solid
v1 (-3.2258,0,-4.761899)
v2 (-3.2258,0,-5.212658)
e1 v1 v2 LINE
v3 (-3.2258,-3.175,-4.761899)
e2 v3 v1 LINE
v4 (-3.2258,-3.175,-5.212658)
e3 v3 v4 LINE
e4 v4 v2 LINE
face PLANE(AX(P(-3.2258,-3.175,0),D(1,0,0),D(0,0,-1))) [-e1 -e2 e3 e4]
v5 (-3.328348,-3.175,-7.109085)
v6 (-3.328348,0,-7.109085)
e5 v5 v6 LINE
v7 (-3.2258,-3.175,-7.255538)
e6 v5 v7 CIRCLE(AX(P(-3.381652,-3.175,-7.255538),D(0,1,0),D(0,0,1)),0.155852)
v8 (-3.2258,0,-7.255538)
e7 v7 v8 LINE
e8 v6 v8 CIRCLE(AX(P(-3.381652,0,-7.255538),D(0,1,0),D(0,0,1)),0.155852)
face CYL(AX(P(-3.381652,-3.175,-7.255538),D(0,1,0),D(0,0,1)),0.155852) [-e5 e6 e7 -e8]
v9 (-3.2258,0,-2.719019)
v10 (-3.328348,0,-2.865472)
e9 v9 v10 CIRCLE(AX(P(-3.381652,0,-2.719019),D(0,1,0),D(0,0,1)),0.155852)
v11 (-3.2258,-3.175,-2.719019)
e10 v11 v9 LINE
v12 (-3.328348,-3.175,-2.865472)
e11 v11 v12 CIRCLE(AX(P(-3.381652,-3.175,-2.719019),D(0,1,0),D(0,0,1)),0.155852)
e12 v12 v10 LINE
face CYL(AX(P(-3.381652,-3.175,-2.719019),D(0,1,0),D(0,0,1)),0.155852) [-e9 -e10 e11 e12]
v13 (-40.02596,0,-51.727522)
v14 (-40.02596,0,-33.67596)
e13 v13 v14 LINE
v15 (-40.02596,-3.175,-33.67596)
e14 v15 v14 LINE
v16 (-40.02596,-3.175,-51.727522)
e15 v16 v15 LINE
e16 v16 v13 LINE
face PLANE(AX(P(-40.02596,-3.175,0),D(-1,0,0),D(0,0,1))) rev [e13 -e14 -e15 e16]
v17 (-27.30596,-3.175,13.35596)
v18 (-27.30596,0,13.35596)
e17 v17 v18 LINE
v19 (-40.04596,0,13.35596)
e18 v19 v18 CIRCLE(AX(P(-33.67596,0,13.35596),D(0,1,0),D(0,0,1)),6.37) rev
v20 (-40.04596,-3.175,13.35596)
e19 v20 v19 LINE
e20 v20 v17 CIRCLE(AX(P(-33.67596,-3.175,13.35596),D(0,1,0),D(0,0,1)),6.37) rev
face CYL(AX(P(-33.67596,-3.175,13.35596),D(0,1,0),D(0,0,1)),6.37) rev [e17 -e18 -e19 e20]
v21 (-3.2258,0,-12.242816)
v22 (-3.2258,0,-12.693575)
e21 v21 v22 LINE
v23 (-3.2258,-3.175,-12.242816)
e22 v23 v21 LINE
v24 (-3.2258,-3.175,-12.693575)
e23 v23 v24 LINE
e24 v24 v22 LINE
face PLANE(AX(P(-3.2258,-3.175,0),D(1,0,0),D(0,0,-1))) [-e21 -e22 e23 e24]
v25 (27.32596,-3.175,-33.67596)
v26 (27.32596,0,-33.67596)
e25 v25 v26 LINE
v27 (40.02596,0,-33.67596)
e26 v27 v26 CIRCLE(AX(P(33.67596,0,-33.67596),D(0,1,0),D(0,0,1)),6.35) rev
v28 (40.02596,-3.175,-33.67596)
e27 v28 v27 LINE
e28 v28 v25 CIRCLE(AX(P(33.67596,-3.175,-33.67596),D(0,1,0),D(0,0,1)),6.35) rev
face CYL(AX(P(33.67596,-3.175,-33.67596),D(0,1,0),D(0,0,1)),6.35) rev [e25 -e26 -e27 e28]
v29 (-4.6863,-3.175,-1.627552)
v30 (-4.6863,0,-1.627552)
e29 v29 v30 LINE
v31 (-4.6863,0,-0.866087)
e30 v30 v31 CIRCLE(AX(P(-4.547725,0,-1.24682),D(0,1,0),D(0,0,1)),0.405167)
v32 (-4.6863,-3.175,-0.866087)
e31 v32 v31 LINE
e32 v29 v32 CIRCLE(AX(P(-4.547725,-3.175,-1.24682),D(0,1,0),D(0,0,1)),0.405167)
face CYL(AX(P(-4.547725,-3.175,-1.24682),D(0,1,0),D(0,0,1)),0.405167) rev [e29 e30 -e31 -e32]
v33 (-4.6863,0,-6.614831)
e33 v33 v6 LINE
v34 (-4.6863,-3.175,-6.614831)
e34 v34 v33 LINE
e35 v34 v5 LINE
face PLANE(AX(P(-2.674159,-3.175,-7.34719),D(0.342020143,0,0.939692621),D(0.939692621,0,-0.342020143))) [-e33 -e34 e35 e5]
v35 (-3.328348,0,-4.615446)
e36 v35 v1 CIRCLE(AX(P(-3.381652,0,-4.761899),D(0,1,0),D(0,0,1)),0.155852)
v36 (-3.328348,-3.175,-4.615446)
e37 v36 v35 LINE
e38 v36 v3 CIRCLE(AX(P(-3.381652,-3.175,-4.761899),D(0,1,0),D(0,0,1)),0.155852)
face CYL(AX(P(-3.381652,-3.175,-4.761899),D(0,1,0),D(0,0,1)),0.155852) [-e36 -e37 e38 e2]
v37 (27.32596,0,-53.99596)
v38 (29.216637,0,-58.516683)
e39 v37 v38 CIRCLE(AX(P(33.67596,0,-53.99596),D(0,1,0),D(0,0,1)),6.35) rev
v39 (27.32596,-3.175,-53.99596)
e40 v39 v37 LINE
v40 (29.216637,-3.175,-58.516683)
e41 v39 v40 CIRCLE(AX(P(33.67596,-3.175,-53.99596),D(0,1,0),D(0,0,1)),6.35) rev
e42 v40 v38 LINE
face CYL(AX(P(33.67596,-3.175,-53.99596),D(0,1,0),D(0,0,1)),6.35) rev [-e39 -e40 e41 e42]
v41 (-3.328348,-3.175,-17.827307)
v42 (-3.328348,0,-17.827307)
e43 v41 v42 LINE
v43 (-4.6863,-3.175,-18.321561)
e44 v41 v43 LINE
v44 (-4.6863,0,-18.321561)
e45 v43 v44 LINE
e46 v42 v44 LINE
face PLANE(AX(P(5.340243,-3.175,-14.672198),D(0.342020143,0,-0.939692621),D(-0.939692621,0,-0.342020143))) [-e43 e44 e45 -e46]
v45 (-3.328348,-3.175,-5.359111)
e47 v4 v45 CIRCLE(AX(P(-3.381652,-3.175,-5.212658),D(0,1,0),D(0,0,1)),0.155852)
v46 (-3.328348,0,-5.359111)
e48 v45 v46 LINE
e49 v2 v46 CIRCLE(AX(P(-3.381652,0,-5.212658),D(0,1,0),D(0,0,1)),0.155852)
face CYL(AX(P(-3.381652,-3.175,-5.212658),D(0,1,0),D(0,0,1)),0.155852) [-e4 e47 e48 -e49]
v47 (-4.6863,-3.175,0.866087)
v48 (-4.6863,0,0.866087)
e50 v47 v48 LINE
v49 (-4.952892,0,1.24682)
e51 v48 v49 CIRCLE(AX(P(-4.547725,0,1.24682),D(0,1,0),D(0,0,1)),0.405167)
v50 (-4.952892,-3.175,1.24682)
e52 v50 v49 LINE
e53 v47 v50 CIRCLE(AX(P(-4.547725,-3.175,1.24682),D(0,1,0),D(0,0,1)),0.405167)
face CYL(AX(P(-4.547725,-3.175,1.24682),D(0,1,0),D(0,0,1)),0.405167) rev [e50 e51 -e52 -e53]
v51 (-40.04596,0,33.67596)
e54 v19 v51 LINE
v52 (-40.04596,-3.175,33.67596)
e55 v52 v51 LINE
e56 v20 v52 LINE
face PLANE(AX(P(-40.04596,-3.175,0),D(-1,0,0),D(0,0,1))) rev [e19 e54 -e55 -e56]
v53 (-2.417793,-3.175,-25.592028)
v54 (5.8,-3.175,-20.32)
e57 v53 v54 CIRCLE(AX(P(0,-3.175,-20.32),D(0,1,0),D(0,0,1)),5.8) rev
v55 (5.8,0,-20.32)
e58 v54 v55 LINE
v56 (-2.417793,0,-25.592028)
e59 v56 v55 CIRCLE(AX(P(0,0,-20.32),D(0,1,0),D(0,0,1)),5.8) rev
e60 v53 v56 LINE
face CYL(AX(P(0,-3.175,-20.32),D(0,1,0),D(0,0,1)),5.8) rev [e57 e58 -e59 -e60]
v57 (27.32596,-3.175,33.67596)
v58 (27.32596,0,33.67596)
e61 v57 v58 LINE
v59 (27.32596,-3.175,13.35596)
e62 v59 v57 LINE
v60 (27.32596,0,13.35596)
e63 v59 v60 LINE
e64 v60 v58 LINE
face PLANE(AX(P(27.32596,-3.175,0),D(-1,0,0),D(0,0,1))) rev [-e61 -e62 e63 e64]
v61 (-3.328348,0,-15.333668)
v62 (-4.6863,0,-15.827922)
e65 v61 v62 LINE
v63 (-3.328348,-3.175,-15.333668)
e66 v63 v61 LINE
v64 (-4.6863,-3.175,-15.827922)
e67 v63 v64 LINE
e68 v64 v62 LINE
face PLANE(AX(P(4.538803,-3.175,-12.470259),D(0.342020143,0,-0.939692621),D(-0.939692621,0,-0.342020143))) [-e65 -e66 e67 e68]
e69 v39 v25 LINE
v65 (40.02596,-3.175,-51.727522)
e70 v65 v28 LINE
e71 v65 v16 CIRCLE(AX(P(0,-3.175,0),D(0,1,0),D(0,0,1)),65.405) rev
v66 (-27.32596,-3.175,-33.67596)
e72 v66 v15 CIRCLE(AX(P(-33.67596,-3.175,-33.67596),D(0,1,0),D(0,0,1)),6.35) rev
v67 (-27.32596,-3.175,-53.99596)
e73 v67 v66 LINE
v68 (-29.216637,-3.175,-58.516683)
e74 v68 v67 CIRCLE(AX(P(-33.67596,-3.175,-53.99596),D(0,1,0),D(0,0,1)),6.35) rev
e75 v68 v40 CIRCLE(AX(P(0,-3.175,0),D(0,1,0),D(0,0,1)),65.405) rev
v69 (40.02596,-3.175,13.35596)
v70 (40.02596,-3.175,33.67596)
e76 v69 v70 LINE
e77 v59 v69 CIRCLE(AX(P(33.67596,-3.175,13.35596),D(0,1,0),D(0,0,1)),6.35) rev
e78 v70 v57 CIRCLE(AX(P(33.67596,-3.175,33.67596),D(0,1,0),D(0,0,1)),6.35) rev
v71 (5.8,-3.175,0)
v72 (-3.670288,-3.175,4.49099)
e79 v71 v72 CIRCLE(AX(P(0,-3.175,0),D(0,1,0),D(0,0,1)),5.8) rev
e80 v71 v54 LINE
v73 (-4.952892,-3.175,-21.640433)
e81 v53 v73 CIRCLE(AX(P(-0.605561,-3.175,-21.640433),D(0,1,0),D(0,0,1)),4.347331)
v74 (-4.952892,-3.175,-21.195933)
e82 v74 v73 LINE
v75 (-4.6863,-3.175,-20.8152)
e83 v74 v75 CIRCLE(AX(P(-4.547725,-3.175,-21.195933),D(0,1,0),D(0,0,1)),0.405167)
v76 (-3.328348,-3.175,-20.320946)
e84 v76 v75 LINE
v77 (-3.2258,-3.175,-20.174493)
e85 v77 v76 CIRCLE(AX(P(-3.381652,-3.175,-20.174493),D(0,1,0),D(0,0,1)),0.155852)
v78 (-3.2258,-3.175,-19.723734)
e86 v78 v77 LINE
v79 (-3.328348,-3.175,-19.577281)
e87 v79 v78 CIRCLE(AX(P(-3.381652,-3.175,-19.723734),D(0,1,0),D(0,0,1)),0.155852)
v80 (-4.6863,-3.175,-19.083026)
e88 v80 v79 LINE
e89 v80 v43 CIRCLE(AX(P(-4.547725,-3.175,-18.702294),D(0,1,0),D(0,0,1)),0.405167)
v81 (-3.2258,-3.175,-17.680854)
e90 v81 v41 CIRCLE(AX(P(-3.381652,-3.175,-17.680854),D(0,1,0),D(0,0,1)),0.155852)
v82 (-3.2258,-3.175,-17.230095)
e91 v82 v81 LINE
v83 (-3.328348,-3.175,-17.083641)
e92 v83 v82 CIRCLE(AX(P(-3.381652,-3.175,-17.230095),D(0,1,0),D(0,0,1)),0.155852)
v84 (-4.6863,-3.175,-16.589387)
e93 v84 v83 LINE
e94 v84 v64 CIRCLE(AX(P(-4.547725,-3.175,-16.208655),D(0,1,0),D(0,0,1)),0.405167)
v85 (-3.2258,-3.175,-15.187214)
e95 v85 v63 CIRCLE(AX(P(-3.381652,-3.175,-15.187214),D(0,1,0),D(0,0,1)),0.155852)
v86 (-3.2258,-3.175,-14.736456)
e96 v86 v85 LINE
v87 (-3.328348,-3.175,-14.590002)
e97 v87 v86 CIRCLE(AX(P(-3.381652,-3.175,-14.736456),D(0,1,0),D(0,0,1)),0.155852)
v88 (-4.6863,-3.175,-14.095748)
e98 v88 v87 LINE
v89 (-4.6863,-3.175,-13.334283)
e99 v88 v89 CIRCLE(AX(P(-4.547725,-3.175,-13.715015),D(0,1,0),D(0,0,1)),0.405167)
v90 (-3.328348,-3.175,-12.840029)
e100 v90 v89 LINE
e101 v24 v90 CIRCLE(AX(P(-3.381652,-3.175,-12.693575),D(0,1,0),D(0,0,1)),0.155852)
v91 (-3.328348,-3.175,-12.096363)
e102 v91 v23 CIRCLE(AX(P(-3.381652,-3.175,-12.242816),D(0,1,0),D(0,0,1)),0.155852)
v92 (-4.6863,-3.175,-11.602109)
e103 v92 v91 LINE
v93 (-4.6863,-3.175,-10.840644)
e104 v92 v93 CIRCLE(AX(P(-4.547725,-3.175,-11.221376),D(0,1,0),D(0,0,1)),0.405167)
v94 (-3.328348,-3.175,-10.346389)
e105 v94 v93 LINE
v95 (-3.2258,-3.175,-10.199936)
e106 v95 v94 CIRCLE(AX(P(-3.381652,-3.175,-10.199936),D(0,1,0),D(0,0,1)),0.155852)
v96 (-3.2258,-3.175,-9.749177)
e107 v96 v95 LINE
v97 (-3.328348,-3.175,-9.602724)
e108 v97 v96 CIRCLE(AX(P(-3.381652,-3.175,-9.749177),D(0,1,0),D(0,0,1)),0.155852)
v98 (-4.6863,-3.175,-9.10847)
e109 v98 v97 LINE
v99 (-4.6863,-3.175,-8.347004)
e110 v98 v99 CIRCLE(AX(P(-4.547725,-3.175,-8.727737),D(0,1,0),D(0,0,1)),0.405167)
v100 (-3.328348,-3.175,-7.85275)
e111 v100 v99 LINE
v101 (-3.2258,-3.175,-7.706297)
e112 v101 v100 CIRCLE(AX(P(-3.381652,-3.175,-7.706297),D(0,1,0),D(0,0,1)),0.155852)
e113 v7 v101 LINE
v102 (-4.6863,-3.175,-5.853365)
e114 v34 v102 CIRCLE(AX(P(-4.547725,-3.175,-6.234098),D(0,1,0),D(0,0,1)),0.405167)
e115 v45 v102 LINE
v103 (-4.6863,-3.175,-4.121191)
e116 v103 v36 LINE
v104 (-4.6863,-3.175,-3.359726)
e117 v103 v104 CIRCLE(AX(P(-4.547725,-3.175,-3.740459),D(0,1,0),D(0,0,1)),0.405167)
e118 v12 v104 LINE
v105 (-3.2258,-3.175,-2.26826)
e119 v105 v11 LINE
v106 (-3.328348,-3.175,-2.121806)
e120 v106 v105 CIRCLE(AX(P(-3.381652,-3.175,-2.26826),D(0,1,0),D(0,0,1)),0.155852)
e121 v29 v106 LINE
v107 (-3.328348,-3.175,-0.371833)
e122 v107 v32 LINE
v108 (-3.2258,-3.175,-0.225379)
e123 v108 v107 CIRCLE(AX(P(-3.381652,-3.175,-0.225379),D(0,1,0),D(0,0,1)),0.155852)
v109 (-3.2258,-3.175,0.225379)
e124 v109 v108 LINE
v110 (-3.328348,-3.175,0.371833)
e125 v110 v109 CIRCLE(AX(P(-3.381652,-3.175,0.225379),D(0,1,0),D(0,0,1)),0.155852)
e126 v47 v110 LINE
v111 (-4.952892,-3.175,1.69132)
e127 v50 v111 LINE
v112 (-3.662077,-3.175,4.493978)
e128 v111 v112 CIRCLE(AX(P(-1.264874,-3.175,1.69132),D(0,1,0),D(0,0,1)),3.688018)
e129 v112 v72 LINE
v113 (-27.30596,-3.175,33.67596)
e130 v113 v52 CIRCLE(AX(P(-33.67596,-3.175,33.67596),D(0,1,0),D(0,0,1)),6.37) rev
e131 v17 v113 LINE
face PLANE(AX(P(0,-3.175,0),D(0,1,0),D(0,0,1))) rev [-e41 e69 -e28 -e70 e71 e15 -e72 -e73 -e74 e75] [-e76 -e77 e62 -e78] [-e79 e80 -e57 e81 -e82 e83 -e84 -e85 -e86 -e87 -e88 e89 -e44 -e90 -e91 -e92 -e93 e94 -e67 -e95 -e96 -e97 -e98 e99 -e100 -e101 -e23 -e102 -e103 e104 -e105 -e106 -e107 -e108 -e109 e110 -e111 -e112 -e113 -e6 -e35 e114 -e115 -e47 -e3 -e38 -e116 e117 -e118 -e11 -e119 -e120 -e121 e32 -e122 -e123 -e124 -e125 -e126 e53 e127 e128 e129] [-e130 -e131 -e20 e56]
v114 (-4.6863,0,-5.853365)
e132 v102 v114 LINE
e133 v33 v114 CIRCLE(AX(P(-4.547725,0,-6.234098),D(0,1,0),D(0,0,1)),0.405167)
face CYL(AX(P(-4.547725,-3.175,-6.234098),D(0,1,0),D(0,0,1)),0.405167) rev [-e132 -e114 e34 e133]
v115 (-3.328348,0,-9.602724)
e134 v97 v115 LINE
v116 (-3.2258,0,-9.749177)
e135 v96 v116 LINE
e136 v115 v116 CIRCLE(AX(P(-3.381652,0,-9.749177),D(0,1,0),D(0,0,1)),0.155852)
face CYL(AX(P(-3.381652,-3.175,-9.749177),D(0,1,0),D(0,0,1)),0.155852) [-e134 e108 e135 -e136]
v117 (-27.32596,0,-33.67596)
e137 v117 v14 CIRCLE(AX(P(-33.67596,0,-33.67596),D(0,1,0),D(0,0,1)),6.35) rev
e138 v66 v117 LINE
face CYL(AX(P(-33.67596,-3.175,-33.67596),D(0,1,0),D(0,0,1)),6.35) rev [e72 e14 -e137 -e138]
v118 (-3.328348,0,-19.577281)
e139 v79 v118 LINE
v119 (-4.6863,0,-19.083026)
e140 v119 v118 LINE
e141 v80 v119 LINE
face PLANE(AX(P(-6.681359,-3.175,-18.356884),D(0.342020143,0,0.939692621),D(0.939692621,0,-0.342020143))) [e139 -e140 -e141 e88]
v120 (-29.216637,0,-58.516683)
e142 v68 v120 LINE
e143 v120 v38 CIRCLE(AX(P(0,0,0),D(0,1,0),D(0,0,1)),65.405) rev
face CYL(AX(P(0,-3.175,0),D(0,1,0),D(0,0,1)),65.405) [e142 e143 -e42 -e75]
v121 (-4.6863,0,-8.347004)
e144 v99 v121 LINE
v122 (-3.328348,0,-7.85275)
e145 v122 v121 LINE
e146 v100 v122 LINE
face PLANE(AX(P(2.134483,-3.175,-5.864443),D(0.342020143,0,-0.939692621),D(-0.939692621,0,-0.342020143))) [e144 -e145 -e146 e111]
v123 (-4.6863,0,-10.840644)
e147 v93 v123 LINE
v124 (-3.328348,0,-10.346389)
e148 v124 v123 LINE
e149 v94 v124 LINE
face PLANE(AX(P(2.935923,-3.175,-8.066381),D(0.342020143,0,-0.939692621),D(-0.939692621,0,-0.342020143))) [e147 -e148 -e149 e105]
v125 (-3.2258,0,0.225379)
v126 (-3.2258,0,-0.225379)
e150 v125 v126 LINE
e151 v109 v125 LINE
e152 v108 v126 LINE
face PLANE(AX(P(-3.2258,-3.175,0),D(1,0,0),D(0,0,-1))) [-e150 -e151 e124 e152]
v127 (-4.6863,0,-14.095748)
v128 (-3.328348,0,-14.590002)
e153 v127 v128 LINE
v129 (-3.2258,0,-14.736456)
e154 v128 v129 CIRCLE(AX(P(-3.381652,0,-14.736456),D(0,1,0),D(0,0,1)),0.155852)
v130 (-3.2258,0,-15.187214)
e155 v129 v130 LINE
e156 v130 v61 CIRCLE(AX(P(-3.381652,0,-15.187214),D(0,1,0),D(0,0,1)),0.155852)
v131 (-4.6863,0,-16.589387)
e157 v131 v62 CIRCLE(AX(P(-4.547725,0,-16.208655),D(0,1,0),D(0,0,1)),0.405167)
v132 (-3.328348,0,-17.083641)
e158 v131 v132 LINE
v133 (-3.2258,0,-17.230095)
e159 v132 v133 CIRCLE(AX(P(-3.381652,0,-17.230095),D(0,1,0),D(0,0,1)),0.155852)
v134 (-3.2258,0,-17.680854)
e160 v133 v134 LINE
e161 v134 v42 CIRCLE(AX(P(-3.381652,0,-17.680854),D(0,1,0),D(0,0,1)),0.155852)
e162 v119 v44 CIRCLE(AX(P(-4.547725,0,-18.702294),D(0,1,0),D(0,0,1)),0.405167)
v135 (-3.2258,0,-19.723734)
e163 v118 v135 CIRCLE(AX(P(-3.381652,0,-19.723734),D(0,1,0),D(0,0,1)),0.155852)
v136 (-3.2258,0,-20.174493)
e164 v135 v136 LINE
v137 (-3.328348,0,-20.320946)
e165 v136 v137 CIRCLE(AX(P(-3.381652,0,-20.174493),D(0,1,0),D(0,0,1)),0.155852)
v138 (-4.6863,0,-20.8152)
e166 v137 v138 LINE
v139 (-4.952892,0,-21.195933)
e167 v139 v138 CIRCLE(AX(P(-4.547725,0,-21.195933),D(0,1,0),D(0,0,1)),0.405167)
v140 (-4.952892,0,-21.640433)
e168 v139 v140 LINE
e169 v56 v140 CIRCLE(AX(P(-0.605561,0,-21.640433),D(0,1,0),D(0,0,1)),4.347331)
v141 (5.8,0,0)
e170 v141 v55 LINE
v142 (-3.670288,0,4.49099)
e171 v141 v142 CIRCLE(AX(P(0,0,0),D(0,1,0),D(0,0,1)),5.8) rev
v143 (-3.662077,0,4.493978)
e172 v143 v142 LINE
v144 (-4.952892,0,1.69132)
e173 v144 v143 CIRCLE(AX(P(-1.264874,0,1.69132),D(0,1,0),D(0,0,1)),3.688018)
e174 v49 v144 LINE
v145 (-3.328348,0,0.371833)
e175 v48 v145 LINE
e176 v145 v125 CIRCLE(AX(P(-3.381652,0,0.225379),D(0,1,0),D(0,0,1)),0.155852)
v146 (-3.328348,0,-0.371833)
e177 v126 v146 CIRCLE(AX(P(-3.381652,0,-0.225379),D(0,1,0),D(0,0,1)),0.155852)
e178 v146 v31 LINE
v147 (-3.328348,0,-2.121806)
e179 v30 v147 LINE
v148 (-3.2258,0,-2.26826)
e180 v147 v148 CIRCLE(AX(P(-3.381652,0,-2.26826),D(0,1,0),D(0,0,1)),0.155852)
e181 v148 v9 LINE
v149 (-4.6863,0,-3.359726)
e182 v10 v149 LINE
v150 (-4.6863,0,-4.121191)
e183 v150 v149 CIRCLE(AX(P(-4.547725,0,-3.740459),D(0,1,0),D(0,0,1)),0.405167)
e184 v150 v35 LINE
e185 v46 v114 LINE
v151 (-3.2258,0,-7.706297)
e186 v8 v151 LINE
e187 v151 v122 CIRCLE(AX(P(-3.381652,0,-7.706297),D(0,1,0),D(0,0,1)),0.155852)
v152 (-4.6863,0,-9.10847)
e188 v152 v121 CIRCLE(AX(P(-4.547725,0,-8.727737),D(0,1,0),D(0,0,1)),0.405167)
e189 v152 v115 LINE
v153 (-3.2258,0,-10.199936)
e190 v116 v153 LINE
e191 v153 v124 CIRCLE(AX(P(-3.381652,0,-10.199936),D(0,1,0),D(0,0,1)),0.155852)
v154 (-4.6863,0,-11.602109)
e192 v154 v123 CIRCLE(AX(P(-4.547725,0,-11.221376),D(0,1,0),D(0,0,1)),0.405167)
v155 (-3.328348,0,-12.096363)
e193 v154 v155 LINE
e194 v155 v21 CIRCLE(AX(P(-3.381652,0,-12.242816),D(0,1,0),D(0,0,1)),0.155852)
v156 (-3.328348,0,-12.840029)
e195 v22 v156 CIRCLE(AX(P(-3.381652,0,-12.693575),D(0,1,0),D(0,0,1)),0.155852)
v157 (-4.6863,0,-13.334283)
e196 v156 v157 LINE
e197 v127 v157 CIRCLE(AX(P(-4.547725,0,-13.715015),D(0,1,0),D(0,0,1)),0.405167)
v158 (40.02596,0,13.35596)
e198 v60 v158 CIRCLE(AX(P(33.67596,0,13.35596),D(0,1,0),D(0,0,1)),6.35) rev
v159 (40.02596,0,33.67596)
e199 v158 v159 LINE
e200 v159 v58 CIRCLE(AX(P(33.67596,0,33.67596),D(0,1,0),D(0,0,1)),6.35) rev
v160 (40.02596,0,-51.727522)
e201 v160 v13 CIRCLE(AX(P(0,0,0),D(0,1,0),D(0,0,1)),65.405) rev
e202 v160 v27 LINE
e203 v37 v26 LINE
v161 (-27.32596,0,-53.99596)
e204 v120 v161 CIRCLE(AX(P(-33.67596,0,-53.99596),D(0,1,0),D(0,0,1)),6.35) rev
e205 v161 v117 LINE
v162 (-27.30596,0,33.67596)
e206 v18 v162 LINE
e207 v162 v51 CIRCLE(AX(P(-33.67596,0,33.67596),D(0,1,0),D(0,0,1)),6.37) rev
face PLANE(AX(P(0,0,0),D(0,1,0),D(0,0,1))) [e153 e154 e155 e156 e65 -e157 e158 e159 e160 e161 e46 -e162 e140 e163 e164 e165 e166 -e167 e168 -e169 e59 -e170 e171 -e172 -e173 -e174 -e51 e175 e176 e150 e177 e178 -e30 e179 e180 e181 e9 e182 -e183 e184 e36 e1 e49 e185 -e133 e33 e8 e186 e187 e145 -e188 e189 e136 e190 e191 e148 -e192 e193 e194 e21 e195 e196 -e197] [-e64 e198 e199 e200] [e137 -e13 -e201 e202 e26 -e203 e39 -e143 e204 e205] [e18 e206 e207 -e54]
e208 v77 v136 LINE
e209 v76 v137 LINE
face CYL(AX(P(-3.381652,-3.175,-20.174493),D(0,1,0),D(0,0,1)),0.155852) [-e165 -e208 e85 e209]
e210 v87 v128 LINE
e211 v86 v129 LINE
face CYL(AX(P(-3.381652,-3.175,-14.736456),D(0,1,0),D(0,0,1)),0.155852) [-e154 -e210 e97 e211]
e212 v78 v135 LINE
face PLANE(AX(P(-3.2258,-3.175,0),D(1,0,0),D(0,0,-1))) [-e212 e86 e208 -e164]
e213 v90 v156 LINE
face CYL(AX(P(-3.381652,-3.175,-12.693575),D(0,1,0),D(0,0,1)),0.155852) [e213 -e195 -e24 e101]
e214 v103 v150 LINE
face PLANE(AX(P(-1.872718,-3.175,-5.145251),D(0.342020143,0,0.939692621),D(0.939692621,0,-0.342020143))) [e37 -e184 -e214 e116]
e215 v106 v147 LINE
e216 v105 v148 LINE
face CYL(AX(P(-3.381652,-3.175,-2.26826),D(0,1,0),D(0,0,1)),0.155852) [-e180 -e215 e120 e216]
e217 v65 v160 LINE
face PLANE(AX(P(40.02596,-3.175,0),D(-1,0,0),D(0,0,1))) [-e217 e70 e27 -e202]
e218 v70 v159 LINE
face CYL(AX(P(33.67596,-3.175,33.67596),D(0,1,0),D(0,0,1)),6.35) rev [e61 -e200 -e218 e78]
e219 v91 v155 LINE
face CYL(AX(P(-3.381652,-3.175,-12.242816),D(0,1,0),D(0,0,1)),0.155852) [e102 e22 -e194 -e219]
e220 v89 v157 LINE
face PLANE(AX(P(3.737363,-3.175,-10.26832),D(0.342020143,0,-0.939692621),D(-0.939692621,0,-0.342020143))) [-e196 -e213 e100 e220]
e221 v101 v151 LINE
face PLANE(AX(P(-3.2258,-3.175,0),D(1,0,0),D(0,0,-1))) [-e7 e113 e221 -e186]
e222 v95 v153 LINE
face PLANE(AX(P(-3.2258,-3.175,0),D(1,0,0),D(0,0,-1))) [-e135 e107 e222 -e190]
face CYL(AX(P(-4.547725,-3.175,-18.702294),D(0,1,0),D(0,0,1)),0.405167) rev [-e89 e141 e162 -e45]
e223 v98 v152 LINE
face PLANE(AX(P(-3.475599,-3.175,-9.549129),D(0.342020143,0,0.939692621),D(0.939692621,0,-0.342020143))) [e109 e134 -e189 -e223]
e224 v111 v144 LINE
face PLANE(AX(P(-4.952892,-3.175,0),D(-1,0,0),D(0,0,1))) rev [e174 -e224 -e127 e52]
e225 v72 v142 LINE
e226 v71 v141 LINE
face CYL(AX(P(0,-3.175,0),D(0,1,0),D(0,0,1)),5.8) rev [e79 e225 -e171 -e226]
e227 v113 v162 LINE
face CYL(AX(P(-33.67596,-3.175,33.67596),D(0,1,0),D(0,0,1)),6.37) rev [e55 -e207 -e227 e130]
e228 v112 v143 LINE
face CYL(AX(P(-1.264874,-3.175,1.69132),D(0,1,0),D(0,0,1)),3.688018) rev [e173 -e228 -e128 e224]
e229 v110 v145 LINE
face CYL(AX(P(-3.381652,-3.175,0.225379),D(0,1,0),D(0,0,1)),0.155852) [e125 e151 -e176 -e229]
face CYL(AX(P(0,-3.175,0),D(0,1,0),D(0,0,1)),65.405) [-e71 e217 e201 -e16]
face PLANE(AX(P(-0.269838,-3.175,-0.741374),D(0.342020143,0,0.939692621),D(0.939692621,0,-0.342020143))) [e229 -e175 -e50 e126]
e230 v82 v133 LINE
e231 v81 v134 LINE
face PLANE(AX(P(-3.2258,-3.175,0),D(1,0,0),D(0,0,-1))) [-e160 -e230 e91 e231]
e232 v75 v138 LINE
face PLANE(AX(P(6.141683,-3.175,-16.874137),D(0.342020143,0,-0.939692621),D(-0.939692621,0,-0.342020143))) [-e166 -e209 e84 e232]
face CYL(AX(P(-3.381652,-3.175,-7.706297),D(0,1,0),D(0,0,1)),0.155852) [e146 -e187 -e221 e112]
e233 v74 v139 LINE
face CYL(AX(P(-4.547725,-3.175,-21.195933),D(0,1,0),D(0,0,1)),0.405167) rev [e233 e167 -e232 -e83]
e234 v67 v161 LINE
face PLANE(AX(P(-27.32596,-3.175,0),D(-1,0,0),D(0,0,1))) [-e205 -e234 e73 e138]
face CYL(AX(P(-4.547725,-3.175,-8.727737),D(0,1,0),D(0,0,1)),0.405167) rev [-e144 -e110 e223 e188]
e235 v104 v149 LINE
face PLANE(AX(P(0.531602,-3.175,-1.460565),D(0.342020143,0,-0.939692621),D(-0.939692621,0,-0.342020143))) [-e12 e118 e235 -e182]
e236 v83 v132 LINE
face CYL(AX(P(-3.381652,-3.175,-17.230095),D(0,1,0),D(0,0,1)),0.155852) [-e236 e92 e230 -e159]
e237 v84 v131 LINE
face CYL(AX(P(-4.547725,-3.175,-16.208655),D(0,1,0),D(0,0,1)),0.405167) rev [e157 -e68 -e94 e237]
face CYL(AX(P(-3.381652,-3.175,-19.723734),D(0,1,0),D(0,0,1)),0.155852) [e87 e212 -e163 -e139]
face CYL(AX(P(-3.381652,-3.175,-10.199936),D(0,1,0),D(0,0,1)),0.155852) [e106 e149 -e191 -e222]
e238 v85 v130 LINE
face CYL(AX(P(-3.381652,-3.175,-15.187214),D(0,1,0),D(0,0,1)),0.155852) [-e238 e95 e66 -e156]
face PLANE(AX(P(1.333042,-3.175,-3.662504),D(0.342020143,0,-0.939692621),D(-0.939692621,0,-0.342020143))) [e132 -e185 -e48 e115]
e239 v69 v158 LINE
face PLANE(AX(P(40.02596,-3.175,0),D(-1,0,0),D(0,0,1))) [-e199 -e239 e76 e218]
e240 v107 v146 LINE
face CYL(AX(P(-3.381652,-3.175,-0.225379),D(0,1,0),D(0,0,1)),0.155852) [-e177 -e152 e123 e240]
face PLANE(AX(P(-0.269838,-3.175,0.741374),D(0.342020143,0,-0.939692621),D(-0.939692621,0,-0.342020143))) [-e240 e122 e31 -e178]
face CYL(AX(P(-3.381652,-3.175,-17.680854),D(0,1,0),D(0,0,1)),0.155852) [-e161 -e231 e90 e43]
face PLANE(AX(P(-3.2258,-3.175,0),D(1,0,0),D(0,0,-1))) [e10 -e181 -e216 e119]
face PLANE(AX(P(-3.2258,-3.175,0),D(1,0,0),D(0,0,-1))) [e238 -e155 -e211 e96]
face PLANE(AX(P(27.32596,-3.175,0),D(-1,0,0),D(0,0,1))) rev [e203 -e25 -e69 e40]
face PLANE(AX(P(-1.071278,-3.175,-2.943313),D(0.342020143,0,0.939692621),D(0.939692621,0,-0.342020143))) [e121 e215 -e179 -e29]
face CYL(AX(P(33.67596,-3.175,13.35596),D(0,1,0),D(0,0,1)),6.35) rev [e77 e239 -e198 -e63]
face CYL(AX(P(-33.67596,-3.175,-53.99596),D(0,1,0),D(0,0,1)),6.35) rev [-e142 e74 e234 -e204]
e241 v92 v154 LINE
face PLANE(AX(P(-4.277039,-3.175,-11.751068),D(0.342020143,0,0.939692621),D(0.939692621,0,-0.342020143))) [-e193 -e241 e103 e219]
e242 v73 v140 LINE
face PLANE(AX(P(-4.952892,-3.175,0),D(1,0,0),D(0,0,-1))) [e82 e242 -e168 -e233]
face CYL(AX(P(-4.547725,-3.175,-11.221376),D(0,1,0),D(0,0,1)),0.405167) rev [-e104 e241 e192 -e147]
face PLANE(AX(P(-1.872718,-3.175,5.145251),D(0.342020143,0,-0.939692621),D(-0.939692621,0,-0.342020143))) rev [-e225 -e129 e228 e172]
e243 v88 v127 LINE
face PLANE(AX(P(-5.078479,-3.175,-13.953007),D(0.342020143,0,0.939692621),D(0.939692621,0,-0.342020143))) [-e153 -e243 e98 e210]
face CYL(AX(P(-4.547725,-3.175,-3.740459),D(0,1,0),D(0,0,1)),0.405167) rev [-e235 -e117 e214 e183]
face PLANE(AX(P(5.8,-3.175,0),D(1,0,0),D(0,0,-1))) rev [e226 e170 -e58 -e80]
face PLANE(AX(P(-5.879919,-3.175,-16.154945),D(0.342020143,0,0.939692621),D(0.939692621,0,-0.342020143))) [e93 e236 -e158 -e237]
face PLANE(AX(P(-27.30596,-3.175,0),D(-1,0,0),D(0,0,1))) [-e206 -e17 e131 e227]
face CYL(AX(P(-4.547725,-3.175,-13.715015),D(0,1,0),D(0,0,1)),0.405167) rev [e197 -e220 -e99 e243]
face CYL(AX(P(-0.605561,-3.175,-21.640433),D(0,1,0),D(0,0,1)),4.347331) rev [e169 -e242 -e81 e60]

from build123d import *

# Parameters (mm, degrees)
BOSS_EXTRUDE1_DEPTH = 3.175
BOSS_EXTRUDE3_START = -3.175
BOSS_EXTRUDE3_DEPTH = 3.175


# Read off the part's stored shape, not the designer's step: Boss-Extrude3
with BuildPart() as part:
    # Sketch3 → Boss-Extrude1 (new body)
    with BuildSketch(Plane.XZ):
        with BuildLine():
            ThreePointArc((65.405, 0), (-28.808992359, 58.718446712), (-40.025960454, -51.727521831))
            Line((-40.025960454, -51.727521831), (-40.025960454, -33.675960454))
            ThreePointArc((-40.025960454, -33.675960454), (-33.675960454, -27.325960454), (-27.325960454, -33.675960454))
            Line((-27.325960454, -33.675960454), (-27.325960454, -53.995960454))
            ThreePointArc((-27.325960454, -53.995960454), (-27.817666914, -56.446041432), (-29.21663661, -58.516682836))
            ThreePointArc((-29.21663661, -58.516682836), (0, -65.405), (29.21663661, -58.516682836))
            ThreePointArc((29.21663661, -58.516682836), (27.817666914, -56.446041432), (27.325960454, -53.995960454))
            Line((27.325960454, -53.995960454), (27.325960454, -33.675960454))
            ThreePointArc((27.325960454, -33.675960454), (33.675960454, -27.325960454), (40.025960454, -33.675960454))
            Line((40.025960454, -33.675960454), (40.025960454, -51.727521831))
            ThreePointArc((40.025960454, -51.727521831), (58.718446712, -28.808992359), (65.405, 0))
        make_face()
        with BuildLine():
            ThreePointArc((-5.8, 0), (0, 5.8), (5.8, 0))
            Line((5.8, 0), (5.8, -20.32))
            ThreePointArc((5.8, -20.32), (0, -26.12), (-5.8, -20.32))
            Line((-5.8, -20.32), (-5.8, 0))
        make_face(mode=Mode.SUBTRACT)
        with BuildLine():
            ThreePointArc((-27.305960454, 13.355960454), (-33.675960454, 6.985960454), (-40.045960454, 13.355960454))
            Line((-40.045960454, 13.355960454), (-40.045960454, 33.675960454))
            ThreePointArc((-40.045960454, 33.675960454), (-33.675960454, 40.045960454), (-27.305960454, 33.675960454))
            Line((-27.305960454, 33.675960454), (-27.305960454, 13.355960454))
        make_face(mode=Mode.SUBTRACT)
        with BuildLine():
            ThreePointArc((40.025960454, 13.355960454), (33.675960454, 7.005960454), (27.325960454, 13.355960454))
            Line((27.325960454, 13.355960454), (27.325960454, 33.675960454))
            ThreePointArc((27.325960454, 33.675960454), (33.675960454, 40.025960454), (40.025960454, 33.675960454))
            Line((40.025960454, 33.675960454), (40.025960454, 13.355960454))
        make_face(mode=Mode.SUBTRACT)
    extrude(amount=BOSS_EXTRUDE1_DEPTH)

    # Boss-Extrude3 outline → Boss-Extrude3 (add)
    with BuildSketch(Plane(origin=(0, 0, 0), x_dir=(1, 0, 0), z_dir=(0, 1, 0)).offset(BOSS_EXTRUDE3_START)):
        with BuildLine():
            Line((-4.952891864, -1.691319584), (-4.952891864, -1.246819584))
            ThreePointArc((-4.952891864, -1.246819584), (-4.879618202, -1.014425219), (-4.6863, -0.866086946))
            Line((-4.6863, -0.866086946), (-3.328347771, -0.371832755))
            ThreePointArc((-3.328347771, -0.371832755), (-3.253985597, -0.314772651), (-3.2258, -0.22537936))
            Line((-3.2258, -0.22537936), (-3.2258, 0.22537936))
            ThreePointArc((-3.2258, 0.22537936), (-3.253985597, 0.314772651), (-3.328347771, 0.371832755))
            Line((-3.328347771, 0.371832755), (-4.6863, 0.866086946))
            ThreePointArc((-4.6863, 0.866086946), (-4.952891864, 1.246819585), (-4.6863, 1.627552223))
            Line((-4.6863, 1.627552223), (-3.328347771, 2.121806414))
            ThreePointArc((-3.328347771, 2.121806414), (-3.253985597, 2.178866518), (-3.2258, 2.268259809))
            Line((-3.2258, 2.268259809), (-3.2258, 2.719018529))
            ThreePointArc((-3.2258, 2.719018529), (-3.253985597, 2.80841182), (-3.328347771, 2.865471924))
            Line((-3.328347771, 2.865471924), (-4.6863, 3.359726115))
            ThreePointArc((-4.6863, 3.359726115), (-4.952891864, 3.740458754), (-4.6863, 4.121191392))
            Line((-4.6863, 4.121191392), (-3.328347771, 4.615445582))
            ThreePointArc((-3.328347771, 4.615445582), (-3.253985597, 4.672505686), (-3.2258, 4.761898978))
            Line((-3.2258, 4.761898978), (-3.2258, 5.212657697))
            ThreePointArc((-3.2258, 5.212657697), (-3.253985597, 5.302050989), (-3.328347771, 5.359111093))
            Line((-3.328347771, 5.359111093), (-4.6863, 5.853365283))
            ThreePointArc((-4.6863, 5.853365283), (-4.952891864, 6.234097921), (-4.6863, 6.61483056))
            Line((-4.6863, 6.61483056), (-3.328347771, 7.109084751))
            ThreePointArc((-3.328347771, 7.109084751), (-3.253985597, 7.166144855), (-3.2258, 7.255538147))
            Line((-3.2258, 7.255538147), (-3.2258, 7.706296866))
            ThreePointArc((-3.2258, 7.706296866), (-3.253985597, 7.795690157), (-3.328347771, 7.852750261))
            Line((-3.328347771, 7.852750261), (-4.6863, 8.347004452))
            ThreePointArc((-4.6863, 8.347004452), (-4.952891864, 8.72773709), (-4.6863, 9.108469729))
            Line((-4.6863, 9.108469729), (-3.328347771, 9.60272392))
            ThreePointArc((-3.328347771, 9.60272392), (-3.253985597, 9.659784024), (-3.2258, 9.749177315))
            Line((-3.2258, 9.749177315), (-3.2258, 10.199936035))
            ThreePointArc((-3.2258, 10.199936035), (-3.253985597, 10.289329326), (-3.328347771, 10.34638943))
            Line((-3.328347771, 10.34638943), (-4.6863, 10.840643621))
            ThreePointArc((-4.6863, 10.840643621), (-4.952891864, 11.221376259), (-4.6863, 11.602108898))
            Line((-4.6863, 11.602108898), (-3.328347771, 12.096363089))
            ThreePointArc((-3.328347771, 12.096363089), (-3.253985597, 12.153423193), (-3.2258, 12.242816484))
            Line((-3.2258, 12.242816484), (-3.2258, 12.693575204))
            ThreePointArc((-3.2258, 12.693575204), (-3.253985597, 12.782968495), (-3.328347771, 12.840028599))
            Line((-3.328347771, 12.840028599), (-4.6863, 13.33428279))
            ThreePointArc((-4.6863, 13.33428279), (-4.952891864, 13.715015428), (-4.6863, 14.095748067))
            Line((-4.6863, 14.095748067), (-3.328347771, 14.590002258))
            ThreePointArc((-3.328347771, 14.590002258), (-3.253985597, 14.647062362), (-3.2258, 14.736455653))
            Line((-3.2258, 14.736455653), (-3.2258, 15.187214372))
            ThreePointArc((-3.2258, 15.187214372), (-3.253985597, 15.276607664), (-3.328347771, 15.333667768))
            Line((-3.328347771, 15.333667768), (-4.6863, 15.827921959))
            ThreePointArc((-4.6863, 15.827921959), (-4.952891864, 16.208654598), (-4.6863, 16.589387236))
            Line((-4.6863, 16.589387236), (-3.328347771, 17.083641426))
            ThreePointArc((-3.328347771, 17.083641426), (-3.253985597, 17.14070153), (-3.2258, 17.230094822))
            Line((-3.2258, 17.230094822), (-3.2258, 17.680853541))
            ThreePointArc((-3.2258, 17.680853541), (-3.253985597, 17.770246833), (-3.328347771, 17.827306937))
            Line((-3.328347771, 17.827306937), (-4.6863, 18.321561127))
            ThreePointArc((-4.6863, 18.321561127), (-4.952891864, 18.702293766), (-4.6863, 19.083026404))
            Line((-4.6863, 19.083026404), (-3.328347771, 19.577280595))
            ThreePointArc((-3.328347771, 19.577280595), (-3.253985597, 19.634340699), (-3.2258, 19.723733991))
            Line((-3.2258, 19.723733991), (-3.2258, 20.17449271))
            ThreePointArc((-3.2258, 20.17449271), (-3.253985597, 20.263886001), (-3.328347771, 20.320946105))
            Line((-3.328347771, 20.320946105), (-4.6863, 20.815200296))
            ThreePointArc((-4.6863, 20.815200296), (-4.879618202, 20.96353857), (-4.952891864, 21.195932935))
            Line((-4.952891864, 21.195932935), (-4.952891864, 21.640432935))
            ThreePointArc((-4.952891864, 21.640432935), (-4.26463583, 23.987869264), (-2.41779287, 25.592027849))
            ThreePointArc((-2.41779287, 25.592027849), (-4.881761908, 23.45183663), (-5.8, 20.32))
            Line((-5.8, 20.32), (-5.8, 0))
            ThreePointArc((-5.8, 0), (-5.240594871, -2.485189209), (-3.670287792, -4.490989593))
            Line((-3.670287792, -4.490989593), (-3.662076811, -4.493978146))
            ThreePointArc((-3.662076811, -4.493978146), (-4.614680156, -3.234133451), (-4.952891864, -1.691319584))
        make_face()
    extrude(amount=BOSS_EXTRUDE3_DEPTH)


solid = part.part
